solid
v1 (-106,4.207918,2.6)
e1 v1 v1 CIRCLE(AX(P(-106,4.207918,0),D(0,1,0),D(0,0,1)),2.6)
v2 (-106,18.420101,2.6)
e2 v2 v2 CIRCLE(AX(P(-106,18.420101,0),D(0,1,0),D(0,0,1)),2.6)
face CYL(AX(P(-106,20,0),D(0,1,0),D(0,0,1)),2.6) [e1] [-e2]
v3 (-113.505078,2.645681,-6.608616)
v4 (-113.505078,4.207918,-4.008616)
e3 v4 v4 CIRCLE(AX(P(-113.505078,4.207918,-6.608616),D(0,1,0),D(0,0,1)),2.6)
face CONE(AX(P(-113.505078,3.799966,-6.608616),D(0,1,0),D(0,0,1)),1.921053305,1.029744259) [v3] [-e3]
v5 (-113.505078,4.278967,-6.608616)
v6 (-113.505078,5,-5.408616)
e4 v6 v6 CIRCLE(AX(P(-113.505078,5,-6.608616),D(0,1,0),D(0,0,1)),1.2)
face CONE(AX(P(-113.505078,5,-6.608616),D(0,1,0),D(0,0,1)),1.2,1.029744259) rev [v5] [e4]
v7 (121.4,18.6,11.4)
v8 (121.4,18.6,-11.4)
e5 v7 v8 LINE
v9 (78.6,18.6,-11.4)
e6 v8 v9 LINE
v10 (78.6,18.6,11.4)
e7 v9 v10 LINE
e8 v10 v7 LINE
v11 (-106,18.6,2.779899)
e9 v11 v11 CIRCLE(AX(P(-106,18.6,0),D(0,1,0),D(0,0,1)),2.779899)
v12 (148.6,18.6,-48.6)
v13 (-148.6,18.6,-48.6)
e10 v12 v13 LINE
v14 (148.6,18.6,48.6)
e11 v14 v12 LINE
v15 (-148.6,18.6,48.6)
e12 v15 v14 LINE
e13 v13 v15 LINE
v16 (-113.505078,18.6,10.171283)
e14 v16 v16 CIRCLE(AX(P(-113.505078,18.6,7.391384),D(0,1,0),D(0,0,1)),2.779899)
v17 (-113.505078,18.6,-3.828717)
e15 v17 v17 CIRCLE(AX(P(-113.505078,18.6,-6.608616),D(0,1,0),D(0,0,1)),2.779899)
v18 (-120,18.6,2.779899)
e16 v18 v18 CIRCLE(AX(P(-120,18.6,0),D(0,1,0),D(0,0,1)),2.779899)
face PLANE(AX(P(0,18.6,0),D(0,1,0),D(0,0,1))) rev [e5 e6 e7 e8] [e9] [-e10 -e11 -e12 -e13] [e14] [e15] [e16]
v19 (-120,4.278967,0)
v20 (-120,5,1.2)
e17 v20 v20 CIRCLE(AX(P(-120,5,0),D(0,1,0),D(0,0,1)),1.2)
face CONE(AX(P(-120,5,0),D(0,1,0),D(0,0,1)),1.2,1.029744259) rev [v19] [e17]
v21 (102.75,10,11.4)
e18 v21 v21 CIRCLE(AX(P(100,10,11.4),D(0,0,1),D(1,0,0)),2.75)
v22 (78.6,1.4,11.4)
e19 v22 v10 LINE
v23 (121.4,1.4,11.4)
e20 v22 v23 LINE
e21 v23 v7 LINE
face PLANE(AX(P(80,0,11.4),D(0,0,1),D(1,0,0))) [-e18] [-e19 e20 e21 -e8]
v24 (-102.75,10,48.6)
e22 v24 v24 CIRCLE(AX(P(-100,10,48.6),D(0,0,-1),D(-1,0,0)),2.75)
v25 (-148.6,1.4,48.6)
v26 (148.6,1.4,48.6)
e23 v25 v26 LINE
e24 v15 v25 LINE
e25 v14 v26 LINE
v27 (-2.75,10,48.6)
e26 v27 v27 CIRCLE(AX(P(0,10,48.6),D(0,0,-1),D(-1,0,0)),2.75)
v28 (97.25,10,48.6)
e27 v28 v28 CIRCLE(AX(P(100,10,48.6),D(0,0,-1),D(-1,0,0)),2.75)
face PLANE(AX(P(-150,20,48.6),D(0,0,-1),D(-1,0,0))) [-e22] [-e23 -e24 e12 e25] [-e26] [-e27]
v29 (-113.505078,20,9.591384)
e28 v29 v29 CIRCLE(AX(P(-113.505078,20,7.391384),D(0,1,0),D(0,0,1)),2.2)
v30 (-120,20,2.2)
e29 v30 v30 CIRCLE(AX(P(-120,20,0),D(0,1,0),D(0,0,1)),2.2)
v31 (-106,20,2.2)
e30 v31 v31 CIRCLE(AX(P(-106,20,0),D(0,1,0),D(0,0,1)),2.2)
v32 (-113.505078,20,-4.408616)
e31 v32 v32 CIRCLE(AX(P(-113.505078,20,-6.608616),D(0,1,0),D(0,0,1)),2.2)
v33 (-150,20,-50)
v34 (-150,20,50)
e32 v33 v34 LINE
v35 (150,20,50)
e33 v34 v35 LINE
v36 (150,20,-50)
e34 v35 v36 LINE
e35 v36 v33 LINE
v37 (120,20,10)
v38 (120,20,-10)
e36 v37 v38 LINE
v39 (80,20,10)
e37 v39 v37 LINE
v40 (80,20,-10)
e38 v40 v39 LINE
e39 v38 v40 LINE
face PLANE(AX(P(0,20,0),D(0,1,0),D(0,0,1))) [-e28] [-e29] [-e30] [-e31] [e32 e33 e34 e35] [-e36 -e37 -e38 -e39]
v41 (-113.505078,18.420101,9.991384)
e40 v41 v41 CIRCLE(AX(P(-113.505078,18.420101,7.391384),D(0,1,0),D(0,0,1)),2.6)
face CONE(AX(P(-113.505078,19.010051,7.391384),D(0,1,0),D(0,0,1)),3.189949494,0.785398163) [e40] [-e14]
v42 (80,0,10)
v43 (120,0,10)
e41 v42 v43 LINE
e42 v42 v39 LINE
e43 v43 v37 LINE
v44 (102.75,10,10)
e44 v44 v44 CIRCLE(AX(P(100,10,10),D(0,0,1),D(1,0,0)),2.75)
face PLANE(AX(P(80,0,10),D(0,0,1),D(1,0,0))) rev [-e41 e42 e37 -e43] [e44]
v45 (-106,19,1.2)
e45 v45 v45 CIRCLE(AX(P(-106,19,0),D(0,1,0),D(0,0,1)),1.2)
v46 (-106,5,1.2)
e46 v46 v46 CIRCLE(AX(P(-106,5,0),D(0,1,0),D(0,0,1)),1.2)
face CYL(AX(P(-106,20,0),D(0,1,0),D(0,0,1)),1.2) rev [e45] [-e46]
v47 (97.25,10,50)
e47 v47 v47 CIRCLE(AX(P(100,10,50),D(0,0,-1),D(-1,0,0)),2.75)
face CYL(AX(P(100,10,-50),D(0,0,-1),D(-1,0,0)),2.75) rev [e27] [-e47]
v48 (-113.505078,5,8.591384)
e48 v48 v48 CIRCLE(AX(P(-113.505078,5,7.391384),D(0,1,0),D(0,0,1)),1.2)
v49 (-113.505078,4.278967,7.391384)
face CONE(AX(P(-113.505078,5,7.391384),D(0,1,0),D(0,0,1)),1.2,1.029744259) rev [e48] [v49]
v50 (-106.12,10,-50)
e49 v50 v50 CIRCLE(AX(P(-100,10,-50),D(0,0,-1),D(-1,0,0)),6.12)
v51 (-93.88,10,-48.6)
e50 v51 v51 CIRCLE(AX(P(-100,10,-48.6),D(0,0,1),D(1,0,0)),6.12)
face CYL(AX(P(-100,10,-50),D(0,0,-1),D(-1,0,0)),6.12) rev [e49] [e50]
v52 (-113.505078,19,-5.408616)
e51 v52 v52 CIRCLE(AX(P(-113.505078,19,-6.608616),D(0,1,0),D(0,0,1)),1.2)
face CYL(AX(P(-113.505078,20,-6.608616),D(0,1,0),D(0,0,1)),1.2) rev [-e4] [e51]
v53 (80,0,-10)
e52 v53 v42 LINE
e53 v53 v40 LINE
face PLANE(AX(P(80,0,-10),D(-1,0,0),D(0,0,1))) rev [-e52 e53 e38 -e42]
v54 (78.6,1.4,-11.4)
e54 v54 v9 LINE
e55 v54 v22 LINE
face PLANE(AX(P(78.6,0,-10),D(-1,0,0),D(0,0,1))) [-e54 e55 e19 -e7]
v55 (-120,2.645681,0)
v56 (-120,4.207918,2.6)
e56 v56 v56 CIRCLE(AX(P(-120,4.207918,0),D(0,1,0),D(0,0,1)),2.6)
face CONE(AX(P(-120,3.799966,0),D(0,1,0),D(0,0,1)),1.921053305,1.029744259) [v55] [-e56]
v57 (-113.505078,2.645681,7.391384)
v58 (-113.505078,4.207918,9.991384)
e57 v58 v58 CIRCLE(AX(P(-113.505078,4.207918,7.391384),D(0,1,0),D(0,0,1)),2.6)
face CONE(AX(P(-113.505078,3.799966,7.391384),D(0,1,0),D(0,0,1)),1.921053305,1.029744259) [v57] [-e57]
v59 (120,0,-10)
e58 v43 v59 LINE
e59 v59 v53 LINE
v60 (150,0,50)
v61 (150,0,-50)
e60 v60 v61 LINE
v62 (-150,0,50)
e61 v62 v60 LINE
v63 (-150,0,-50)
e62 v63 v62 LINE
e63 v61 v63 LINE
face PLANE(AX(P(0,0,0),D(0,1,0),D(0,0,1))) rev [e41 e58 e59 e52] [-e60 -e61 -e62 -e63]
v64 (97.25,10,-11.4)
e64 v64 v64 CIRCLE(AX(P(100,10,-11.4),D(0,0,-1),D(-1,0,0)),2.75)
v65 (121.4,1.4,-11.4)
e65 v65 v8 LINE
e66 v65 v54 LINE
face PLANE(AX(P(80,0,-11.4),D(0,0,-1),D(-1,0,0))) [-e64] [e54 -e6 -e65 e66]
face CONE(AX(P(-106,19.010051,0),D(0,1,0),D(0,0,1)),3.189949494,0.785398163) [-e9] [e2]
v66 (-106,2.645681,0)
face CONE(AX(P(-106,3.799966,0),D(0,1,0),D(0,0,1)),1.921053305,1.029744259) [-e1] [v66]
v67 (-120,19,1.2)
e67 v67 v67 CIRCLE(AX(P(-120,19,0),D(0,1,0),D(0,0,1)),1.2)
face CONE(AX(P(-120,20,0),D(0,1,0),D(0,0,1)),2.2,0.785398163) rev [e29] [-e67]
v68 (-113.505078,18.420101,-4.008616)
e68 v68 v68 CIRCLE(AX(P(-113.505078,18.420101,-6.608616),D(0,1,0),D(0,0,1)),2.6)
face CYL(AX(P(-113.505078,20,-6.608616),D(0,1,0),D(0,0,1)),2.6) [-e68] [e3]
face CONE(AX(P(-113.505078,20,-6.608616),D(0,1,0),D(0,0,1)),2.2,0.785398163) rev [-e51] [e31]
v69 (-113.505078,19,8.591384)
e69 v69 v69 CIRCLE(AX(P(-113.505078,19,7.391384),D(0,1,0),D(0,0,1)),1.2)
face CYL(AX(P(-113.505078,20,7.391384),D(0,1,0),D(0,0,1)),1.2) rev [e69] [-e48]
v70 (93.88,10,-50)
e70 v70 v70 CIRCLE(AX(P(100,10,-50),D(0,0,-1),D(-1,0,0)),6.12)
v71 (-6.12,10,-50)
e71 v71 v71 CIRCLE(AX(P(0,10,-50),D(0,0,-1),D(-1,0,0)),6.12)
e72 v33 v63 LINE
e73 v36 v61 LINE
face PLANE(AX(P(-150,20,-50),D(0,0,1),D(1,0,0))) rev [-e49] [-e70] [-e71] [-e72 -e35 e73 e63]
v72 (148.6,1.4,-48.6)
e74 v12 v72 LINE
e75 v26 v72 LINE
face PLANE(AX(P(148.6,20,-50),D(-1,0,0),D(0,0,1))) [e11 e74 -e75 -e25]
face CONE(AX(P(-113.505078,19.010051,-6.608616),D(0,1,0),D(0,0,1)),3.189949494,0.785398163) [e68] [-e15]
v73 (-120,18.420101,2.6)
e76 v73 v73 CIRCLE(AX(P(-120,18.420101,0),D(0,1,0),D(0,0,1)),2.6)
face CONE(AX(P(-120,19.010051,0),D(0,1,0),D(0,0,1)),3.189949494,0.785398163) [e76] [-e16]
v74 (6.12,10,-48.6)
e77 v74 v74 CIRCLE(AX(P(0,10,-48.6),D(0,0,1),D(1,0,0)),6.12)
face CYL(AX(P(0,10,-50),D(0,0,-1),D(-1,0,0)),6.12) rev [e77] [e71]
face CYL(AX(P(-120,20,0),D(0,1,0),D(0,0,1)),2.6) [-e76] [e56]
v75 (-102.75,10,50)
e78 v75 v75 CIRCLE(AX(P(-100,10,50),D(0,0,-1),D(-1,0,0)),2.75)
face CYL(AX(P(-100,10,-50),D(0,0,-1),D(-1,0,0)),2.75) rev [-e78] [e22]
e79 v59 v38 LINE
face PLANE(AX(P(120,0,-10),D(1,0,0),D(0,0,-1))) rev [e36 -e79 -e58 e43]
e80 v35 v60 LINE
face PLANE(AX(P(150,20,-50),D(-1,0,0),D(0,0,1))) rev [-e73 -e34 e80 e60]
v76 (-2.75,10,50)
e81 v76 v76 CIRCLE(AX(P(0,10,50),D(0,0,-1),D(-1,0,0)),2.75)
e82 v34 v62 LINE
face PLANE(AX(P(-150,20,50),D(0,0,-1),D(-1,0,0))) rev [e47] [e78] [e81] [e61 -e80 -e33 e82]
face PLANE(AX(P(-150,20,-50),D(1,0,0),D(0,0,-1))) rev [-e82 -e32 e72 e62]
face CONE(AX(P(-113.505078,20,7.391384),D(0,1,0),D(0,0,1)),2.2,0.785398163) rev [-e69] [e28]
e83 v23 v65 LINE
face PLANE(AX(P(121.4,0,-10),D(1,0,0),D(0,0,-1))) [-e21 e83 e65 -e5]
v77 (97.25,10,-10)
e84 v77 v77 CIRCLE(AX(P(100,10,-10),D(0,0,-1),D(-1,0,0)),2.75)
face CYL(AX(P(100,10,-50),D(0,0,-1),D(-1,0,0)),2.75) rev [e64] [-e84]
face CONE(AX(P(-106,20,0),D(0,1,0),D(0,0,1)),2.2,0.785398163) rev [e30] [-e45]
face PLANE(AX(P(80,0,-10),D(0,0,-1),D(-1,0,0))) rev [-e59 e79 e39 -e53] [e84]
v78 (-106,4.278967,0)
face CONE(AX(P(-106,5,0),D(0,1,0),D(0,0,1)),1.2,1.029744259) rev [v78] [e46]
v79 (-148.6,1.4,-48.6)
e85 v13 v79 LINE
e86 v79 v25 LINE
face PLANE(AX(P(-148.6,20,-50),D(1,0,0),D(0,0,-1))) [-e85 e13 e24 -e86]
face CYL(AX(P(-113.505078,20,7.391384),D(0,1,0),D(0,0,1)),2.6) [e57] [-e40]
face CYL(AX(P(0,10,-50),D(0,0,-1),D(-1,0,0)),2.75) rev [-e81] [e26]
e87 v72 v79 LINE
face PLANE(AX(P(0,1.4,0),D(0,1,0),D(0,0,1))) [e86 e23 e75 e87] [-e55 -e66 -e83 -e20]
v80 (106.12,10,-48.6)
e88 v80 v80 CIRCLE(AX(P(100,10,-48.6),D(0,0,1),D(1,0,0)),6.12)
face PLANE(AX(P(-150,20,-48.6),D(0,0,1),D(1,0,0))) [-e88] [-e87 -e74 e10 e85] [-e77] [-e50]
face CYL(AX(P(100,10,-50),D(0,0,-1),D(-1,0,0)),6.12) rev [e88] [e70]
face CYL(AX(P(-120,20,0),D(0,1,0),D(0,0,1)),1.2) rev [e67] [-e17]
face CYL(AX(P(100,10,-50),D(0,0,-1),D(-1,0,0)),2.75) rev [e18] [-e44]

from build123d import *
from build123d.topology import SkipClean

# Parameters (mm, degrees)
SKETCH1_W                                       = 300
SKETCH1_H                                       = 100
BOSS_EXTRUDE1_DEPTH                             = 20
CSK_FOR_M2_FLAT_HEAD_MACHINE_SCREW1_D           = 2.4
CSK_FOR_M2_FLAT_HEAD_MACHINE_SCREW1_DEPTH       = 15
CSK_FOR_M2_FLAT_HEAD_MACHINE_SCREW1_CSINK_D     = 4.4
CSK_FOR_M2_FLAT_HEAD_MACHINE_SCREW1_CSINK_ANGLE = 90
CSK_FOR_M2_FLAT_HEAD_MACHINE_SCREW1_TIP         = 0.721032743
SKETCH5_W                                       = 40
SKETCH5_H                                       = 20
CUT_EXTRUDE1_DEPTH                              = 160.373774505
SHELL1_START                                    = 1.4
SHELL1_OUTLINE_W                                = 297.2
SHELL1_OUTLINE_H                                = 97.2
SHELL1_OUTLINE_R                                = 2.6
SHELL1_OUTLINE_W_2                              = 42.8
SHELL1_OUTLINE_H_2                              = 22.8
SHELL1_DEPTH                                    = 17.020100913
SHELL1_2_OUTLINE_R                              = 2.6
SHELL1_2_DEPTH                                  = 1.245680401
SHELL1_START_2                                  = 18.420101013
SHELL1_4_OUTLINE_W                              = 297.2
SHELL1_4_OUTLINE_H                              = 97.2
SHELL1_4_OUTLINE_W_2                            = 42.8
SHELL1_4_OUTLINE_H_2                            = 22.8
SHELL1_4_OUTLINE_W_3                            = 40
SHELL1_4_OUTLINE_H_3                            = 20
SHELL1_4_DEPTH                                  = 0.179898987
CBORE_FOR_M5_HEX_HEAD_BOLT1_D                   = 5.5
CBORE_FOR_M5_HEX_HEAD_BOLT1_CBORE_D             = 12.24
CBORE_FOR_M5_HEX_HEAD_BOLT1_CBORE_DEPTH         = 3.58


with BuildPart() as part:
    # Sketch1 → Boss-Extrude1 (new body)
    with BuildSketch(Plane(origin=(0, 0, 0), x_dir=(1, 0, 0), z_dir=(0, 1, 0))):
        Rectangle(SKETCH1_W, SKETCH1_H)
    extrude(amount=BOSS_EXTRUDE1_DEPTH)

    # CSK for M2 Flat Head Machine Screw1
    with Locations(Plane(origin=(0, 20, 0), x_dir=(1, 0, 0), z_dir=(0, 1, 0))):
        with Locations((-120, 0), (-106, 0), (-113.505077549, 6.60861642), (-113.505077549, -7.39138358)):
            CounterSinkHole(CSK_FOR_M2_FLAT_HEAD_MACHINE_SCREW1_D / 2, CSK_FOR_M2_FLAT_HEAD_MACHINE_SCREW1_CSINK_D / 2, depth=CSK_FOR_M2_FLAT_HEAD_MACHINE_SCREW1_DEPTH, counter_sink_angle=CSK_FOR_M2_FLAT_HEAD_MACHINE_SCREW1_CSINK_ANGLE)
            with Locations((0, 0, -(CSK_FOR_M2_FLAT_HEAD_MACHINE_SCREW1_DEPTH + CSK_FOR_M2_FLAT_HEAD_MACHINE_SCREW1_TIP / 2))):  # 118° drill point
                Cone(0, CSK_FOR_M2_FLAT_HEAD_MACHINE_SCREW1_D / 2, CSK_FOR_M2_FLAT_HEAD_MACHINE_SCREW1_TIP, mode=Mode.SUBTRACT)

    # Sketch5 → Cut-Extrude1 (cut, through all)
    with BuildSketch(Plane(origin=(0, 20, 0), x_dir=(1, 0, 0), z_dir=(0, 1, 0))):
        with Locations((100, 0)):
            Rectangle(SKETCH5_W, SKETCH5_H)
    extrude(amount=-CUT_EXTRUDE1_DEPTH, mode=Mode.SUBTRACT)

    # Shell1: read off the stored shape, not the designer's step
    # Shell1 outline → Shell1 (cut)
    with BuildSketch(Plane(origin=(0, 0, 0), x_dir=(1, 0, 0), z_dir=(0, 1, 0)).offset(SHELL1_START)):
        Rectangle(SHELL1_OUTLINE_W, SHELL1_OUTLINE_H)
        with Locations((-113.505077549, -7.39138358)):
            Circle(SHELL1_OUTLINE_R, mode=Mode.SUBTRACT)
        with Locations((-120, 0)):
            Circle(SHELL1_OUTLINE_R, mode=Mode.SUBTRACT)
        with Locations((-113.505077549, 6.60861642)):
            Circle(SHELL1_OUTLINE_R, mode=Mode.SUBTRACT)
        with Locations((-106, 0)):
            Circle(SHELL1_OUTLINE_R, mode=Mode.SUBTRACT)
        with Locations((100, 0)):
            Rectangle(SHELL1_OUTLINE_W_2, SHELL1_OUTLINE_H_2, mode=Mode.SUBTRACT)
    extrude(amount=SHELL1_DEPTH, mode=Mode.SUBTRACT)

    # Shell1 2 outline → Shell1 2 (cut)
    with BuildSketch(Plane(origin=(0, 0, 0), x_dir=(1, 0, 0), z_dir=(0, 1, 0)).offset(SHELL1_START)):
        with Locations((-113.505077549, -7.39138358)):
            Circle(SHELL1_2_OUTLINE_R)
        with Locations((-113.505077549, 6.60861642)):
            Circle(SHELL1_2_OUTLINE_R)
        with Locations((-106, 0)):
            Circle(SHELL1_2_OUTLINE_R)
        with Locations((-120, 0)):
            Circle(SHELL1_2_OUTLINE_R)
    extrude(amount=SHELL1_2_DEPTH, mode=Mode.SUBTRACT)

    # Shell1 3 outline → Shell1 3 (revolve, cut)
    with BuildSketch(Plane(origin=(-113.505077549, 0, 7.39138358), x_dir=(1, 0, 0), z_dir=(0, 0, 1))):
        Polygon((268.018855143, 18.6), (2.779898987, 18.6), (2.6, 18.420101013), (268.018855143, 18.420101013), align=None)
        Polygon((2.6, 2.645680501), (2.6, 4.207918111), (0, 2.645680501), align=None)
    revolve(axis=Axis((-113.505077549, 0, 7.39138358), (0, 1, 0)), mode=Mode.SUBTRACT)

    # Shell1 4 outline → Shell1 4 (add)
    # profile 1 of 2: a face of its own
    with BuildSketch(Plane(origin=(0, 0, 0), x_dir=(1, 0, 0), z_dir=(0, 1, 0)).offset(SHELL1_START_2)):
        with BuildLine():
            Line((150, -50), (150, 41.590049821))
            ThreePointArc((150, 41.590049821), (149.323371513, 45.099692578), (148.6, 48.6))
            ThreePointArc((148.6, 48.6), (148.449442912, 49.300202411), (148.297015267, 50))
            Line((148.297015267, 50), (-150, 50))
            Line((-150, 50), (-150, -50))
            Line((-150, -50), (150, -50))
        make_face()
        Rectangle(SHELL1_4_OUTLINE_W, SHELL1_4_OUTLINE_H, mode=Mode.SUBTRACT)
    # profile 2 of 2: a face of its own
    with BuildSketch(Plane(origin=(0, 0, 0), x_dir=(1, 0, 0), z_dir=(0, 1, 0)).offset(SHELL1_START_2)):
        with Locations((100, 0)):
            Rectangle(SHELL1_4_OUTLINE_W_2, SHELL1_4_OUTLINE_H_2)
        with Locations((100, 0)):
            Rectangle(SHELL1_4_OUTLINE_W_3, SHELL1_4_OUTLINE_H_3, mode=Mode.SUBTRACT)
    extrude(amount=SHELL1_4_DEPTH)

    # Shell1 5 outline → Shell1 5 (revolve)
    with SkipClean():  # the faces are left unmerged after this step: merging them gives an invalid solid
        with BuildSketch(Plane(origin=(-113.505077549, 0, -6.60861642), x_dir=(1, 0, 0), z_dir=(0, 0, 1))):
            Polygon((2.779898987, 18.6), (1.2, 18.6), (1.2, 18.420101013), (2.6, 18.420101013), align=None)
        revolve(axis=Axis((-113.505077549, 0, -6.60861642), (0, 1, 0)))
    add(part.part.scale(1), mode=Mode.REPLACE)  # the faces are merged on a copy

    # Shell1 6 outline → Shell1 6 (revolve)
    with SkipClean():  # the faces are left unmerged after this step: merging them gives an invalid solid
        with BuildSketch(Plane(origin=(-106, 0, 0), x_dir=(1, 0, 0), z_dir=(0, 0, 1))):
            Polygon((2.779898987, 18.6), (1.2, 18.6), (1.2, 18.420101013), (2.6, 18.420101013), align=None)
        revolve(axis=Axis((-106, 0, 0), (0, 1, 0)))
    add(part.part.scale(1), mode=Mode.REPLACE)  # the faces are merged on a copy

    # Shell1 7 outline → Shell1 7 (revolve)
    with SkipClean():  # the faces are left unmerged after this step: merging them gives an invalid solid
        with BuildSketch(Plane(origin=(-120, 0, 0), x_dir=(1, 0, 0), z_dir=(0, 0, 1))):
            Polygon((2.779898987, 18.6), (1.2, 18.6), (1.2, 18.420101013), (2.6, 18.420101013), align=None)
        revolve(axis=Axis((-120, 0, 0), (0, 1, 0)))
    add(part.part.scale(1), mode=Mode.REPLACE)  # the faces are merged on a copy

    # Shell1 8 outline → Shell1 8 (revolve, cut)
    with BuildSketch(Plane(origin=(-113.505077549, 0, -6.60861642), x_dir=(1, 0, 0), z_dir=(0, 0, 1))):
        Polygon((0, 2.645680426), (2.6, 2.645680401), (2.6, 4.207918111), align=None)
    revolve(axis=Axis((-113.505077549, 0, -6.60861642), (0, 1, 0)), mode=Mode.SUBTRACT)

    # Shell1 9 outline → Shell1 9 (revolve, cut)
    with BuildSketch(Plane(origin=(-106, 0, 0), x_dir=(1, 0, 0), z_dir=(0, 0, 1))):
        Polygon((0, 2.645680426), (2.6, 2.645680401), (2.6, 4.207918111), align=None)
    revolve(axis=Axis((-106, 0, 0), (0, 1, 0)), mode=Mode.SUBTRACT)

    # Shell1 10 outline → Shell1 10 (revolve, cut)
    with BuildSketch(Plane(origin=(-120, 0, 0), x_dir=(1, 0, 0), z_dir=(0, 0, 1))):
        Polygon((0, 2.645680426), (2.6, 2.645680401), (2.6, 4.207918111), align=None)
    revolve(axis=Axis((-120, 0, 0), (0, 1, 0)), mode=Mode.SUBTRACT)

    # CBORE for M5 Hex Head Bolt1 (through all)
    with Locations(Plane(origin=(0, 0, -50), x_dir=(-1, 0, 0), z_dir=(0, 0, -1))):
        with Locations((0, 10), (-100, 10), (100, 10)):
            CounterBoreHole(CBORE_FOR_M5_HEX_HEAD_BOLT1_D / 2, CBORE_FOR_M5_HEX_HEAD_BOLT1_CBORE_D / 2, CBORE_FOR_M5_HEX_HEAD_BOLT1_CBORE_DEPTH)


solid = part.part
